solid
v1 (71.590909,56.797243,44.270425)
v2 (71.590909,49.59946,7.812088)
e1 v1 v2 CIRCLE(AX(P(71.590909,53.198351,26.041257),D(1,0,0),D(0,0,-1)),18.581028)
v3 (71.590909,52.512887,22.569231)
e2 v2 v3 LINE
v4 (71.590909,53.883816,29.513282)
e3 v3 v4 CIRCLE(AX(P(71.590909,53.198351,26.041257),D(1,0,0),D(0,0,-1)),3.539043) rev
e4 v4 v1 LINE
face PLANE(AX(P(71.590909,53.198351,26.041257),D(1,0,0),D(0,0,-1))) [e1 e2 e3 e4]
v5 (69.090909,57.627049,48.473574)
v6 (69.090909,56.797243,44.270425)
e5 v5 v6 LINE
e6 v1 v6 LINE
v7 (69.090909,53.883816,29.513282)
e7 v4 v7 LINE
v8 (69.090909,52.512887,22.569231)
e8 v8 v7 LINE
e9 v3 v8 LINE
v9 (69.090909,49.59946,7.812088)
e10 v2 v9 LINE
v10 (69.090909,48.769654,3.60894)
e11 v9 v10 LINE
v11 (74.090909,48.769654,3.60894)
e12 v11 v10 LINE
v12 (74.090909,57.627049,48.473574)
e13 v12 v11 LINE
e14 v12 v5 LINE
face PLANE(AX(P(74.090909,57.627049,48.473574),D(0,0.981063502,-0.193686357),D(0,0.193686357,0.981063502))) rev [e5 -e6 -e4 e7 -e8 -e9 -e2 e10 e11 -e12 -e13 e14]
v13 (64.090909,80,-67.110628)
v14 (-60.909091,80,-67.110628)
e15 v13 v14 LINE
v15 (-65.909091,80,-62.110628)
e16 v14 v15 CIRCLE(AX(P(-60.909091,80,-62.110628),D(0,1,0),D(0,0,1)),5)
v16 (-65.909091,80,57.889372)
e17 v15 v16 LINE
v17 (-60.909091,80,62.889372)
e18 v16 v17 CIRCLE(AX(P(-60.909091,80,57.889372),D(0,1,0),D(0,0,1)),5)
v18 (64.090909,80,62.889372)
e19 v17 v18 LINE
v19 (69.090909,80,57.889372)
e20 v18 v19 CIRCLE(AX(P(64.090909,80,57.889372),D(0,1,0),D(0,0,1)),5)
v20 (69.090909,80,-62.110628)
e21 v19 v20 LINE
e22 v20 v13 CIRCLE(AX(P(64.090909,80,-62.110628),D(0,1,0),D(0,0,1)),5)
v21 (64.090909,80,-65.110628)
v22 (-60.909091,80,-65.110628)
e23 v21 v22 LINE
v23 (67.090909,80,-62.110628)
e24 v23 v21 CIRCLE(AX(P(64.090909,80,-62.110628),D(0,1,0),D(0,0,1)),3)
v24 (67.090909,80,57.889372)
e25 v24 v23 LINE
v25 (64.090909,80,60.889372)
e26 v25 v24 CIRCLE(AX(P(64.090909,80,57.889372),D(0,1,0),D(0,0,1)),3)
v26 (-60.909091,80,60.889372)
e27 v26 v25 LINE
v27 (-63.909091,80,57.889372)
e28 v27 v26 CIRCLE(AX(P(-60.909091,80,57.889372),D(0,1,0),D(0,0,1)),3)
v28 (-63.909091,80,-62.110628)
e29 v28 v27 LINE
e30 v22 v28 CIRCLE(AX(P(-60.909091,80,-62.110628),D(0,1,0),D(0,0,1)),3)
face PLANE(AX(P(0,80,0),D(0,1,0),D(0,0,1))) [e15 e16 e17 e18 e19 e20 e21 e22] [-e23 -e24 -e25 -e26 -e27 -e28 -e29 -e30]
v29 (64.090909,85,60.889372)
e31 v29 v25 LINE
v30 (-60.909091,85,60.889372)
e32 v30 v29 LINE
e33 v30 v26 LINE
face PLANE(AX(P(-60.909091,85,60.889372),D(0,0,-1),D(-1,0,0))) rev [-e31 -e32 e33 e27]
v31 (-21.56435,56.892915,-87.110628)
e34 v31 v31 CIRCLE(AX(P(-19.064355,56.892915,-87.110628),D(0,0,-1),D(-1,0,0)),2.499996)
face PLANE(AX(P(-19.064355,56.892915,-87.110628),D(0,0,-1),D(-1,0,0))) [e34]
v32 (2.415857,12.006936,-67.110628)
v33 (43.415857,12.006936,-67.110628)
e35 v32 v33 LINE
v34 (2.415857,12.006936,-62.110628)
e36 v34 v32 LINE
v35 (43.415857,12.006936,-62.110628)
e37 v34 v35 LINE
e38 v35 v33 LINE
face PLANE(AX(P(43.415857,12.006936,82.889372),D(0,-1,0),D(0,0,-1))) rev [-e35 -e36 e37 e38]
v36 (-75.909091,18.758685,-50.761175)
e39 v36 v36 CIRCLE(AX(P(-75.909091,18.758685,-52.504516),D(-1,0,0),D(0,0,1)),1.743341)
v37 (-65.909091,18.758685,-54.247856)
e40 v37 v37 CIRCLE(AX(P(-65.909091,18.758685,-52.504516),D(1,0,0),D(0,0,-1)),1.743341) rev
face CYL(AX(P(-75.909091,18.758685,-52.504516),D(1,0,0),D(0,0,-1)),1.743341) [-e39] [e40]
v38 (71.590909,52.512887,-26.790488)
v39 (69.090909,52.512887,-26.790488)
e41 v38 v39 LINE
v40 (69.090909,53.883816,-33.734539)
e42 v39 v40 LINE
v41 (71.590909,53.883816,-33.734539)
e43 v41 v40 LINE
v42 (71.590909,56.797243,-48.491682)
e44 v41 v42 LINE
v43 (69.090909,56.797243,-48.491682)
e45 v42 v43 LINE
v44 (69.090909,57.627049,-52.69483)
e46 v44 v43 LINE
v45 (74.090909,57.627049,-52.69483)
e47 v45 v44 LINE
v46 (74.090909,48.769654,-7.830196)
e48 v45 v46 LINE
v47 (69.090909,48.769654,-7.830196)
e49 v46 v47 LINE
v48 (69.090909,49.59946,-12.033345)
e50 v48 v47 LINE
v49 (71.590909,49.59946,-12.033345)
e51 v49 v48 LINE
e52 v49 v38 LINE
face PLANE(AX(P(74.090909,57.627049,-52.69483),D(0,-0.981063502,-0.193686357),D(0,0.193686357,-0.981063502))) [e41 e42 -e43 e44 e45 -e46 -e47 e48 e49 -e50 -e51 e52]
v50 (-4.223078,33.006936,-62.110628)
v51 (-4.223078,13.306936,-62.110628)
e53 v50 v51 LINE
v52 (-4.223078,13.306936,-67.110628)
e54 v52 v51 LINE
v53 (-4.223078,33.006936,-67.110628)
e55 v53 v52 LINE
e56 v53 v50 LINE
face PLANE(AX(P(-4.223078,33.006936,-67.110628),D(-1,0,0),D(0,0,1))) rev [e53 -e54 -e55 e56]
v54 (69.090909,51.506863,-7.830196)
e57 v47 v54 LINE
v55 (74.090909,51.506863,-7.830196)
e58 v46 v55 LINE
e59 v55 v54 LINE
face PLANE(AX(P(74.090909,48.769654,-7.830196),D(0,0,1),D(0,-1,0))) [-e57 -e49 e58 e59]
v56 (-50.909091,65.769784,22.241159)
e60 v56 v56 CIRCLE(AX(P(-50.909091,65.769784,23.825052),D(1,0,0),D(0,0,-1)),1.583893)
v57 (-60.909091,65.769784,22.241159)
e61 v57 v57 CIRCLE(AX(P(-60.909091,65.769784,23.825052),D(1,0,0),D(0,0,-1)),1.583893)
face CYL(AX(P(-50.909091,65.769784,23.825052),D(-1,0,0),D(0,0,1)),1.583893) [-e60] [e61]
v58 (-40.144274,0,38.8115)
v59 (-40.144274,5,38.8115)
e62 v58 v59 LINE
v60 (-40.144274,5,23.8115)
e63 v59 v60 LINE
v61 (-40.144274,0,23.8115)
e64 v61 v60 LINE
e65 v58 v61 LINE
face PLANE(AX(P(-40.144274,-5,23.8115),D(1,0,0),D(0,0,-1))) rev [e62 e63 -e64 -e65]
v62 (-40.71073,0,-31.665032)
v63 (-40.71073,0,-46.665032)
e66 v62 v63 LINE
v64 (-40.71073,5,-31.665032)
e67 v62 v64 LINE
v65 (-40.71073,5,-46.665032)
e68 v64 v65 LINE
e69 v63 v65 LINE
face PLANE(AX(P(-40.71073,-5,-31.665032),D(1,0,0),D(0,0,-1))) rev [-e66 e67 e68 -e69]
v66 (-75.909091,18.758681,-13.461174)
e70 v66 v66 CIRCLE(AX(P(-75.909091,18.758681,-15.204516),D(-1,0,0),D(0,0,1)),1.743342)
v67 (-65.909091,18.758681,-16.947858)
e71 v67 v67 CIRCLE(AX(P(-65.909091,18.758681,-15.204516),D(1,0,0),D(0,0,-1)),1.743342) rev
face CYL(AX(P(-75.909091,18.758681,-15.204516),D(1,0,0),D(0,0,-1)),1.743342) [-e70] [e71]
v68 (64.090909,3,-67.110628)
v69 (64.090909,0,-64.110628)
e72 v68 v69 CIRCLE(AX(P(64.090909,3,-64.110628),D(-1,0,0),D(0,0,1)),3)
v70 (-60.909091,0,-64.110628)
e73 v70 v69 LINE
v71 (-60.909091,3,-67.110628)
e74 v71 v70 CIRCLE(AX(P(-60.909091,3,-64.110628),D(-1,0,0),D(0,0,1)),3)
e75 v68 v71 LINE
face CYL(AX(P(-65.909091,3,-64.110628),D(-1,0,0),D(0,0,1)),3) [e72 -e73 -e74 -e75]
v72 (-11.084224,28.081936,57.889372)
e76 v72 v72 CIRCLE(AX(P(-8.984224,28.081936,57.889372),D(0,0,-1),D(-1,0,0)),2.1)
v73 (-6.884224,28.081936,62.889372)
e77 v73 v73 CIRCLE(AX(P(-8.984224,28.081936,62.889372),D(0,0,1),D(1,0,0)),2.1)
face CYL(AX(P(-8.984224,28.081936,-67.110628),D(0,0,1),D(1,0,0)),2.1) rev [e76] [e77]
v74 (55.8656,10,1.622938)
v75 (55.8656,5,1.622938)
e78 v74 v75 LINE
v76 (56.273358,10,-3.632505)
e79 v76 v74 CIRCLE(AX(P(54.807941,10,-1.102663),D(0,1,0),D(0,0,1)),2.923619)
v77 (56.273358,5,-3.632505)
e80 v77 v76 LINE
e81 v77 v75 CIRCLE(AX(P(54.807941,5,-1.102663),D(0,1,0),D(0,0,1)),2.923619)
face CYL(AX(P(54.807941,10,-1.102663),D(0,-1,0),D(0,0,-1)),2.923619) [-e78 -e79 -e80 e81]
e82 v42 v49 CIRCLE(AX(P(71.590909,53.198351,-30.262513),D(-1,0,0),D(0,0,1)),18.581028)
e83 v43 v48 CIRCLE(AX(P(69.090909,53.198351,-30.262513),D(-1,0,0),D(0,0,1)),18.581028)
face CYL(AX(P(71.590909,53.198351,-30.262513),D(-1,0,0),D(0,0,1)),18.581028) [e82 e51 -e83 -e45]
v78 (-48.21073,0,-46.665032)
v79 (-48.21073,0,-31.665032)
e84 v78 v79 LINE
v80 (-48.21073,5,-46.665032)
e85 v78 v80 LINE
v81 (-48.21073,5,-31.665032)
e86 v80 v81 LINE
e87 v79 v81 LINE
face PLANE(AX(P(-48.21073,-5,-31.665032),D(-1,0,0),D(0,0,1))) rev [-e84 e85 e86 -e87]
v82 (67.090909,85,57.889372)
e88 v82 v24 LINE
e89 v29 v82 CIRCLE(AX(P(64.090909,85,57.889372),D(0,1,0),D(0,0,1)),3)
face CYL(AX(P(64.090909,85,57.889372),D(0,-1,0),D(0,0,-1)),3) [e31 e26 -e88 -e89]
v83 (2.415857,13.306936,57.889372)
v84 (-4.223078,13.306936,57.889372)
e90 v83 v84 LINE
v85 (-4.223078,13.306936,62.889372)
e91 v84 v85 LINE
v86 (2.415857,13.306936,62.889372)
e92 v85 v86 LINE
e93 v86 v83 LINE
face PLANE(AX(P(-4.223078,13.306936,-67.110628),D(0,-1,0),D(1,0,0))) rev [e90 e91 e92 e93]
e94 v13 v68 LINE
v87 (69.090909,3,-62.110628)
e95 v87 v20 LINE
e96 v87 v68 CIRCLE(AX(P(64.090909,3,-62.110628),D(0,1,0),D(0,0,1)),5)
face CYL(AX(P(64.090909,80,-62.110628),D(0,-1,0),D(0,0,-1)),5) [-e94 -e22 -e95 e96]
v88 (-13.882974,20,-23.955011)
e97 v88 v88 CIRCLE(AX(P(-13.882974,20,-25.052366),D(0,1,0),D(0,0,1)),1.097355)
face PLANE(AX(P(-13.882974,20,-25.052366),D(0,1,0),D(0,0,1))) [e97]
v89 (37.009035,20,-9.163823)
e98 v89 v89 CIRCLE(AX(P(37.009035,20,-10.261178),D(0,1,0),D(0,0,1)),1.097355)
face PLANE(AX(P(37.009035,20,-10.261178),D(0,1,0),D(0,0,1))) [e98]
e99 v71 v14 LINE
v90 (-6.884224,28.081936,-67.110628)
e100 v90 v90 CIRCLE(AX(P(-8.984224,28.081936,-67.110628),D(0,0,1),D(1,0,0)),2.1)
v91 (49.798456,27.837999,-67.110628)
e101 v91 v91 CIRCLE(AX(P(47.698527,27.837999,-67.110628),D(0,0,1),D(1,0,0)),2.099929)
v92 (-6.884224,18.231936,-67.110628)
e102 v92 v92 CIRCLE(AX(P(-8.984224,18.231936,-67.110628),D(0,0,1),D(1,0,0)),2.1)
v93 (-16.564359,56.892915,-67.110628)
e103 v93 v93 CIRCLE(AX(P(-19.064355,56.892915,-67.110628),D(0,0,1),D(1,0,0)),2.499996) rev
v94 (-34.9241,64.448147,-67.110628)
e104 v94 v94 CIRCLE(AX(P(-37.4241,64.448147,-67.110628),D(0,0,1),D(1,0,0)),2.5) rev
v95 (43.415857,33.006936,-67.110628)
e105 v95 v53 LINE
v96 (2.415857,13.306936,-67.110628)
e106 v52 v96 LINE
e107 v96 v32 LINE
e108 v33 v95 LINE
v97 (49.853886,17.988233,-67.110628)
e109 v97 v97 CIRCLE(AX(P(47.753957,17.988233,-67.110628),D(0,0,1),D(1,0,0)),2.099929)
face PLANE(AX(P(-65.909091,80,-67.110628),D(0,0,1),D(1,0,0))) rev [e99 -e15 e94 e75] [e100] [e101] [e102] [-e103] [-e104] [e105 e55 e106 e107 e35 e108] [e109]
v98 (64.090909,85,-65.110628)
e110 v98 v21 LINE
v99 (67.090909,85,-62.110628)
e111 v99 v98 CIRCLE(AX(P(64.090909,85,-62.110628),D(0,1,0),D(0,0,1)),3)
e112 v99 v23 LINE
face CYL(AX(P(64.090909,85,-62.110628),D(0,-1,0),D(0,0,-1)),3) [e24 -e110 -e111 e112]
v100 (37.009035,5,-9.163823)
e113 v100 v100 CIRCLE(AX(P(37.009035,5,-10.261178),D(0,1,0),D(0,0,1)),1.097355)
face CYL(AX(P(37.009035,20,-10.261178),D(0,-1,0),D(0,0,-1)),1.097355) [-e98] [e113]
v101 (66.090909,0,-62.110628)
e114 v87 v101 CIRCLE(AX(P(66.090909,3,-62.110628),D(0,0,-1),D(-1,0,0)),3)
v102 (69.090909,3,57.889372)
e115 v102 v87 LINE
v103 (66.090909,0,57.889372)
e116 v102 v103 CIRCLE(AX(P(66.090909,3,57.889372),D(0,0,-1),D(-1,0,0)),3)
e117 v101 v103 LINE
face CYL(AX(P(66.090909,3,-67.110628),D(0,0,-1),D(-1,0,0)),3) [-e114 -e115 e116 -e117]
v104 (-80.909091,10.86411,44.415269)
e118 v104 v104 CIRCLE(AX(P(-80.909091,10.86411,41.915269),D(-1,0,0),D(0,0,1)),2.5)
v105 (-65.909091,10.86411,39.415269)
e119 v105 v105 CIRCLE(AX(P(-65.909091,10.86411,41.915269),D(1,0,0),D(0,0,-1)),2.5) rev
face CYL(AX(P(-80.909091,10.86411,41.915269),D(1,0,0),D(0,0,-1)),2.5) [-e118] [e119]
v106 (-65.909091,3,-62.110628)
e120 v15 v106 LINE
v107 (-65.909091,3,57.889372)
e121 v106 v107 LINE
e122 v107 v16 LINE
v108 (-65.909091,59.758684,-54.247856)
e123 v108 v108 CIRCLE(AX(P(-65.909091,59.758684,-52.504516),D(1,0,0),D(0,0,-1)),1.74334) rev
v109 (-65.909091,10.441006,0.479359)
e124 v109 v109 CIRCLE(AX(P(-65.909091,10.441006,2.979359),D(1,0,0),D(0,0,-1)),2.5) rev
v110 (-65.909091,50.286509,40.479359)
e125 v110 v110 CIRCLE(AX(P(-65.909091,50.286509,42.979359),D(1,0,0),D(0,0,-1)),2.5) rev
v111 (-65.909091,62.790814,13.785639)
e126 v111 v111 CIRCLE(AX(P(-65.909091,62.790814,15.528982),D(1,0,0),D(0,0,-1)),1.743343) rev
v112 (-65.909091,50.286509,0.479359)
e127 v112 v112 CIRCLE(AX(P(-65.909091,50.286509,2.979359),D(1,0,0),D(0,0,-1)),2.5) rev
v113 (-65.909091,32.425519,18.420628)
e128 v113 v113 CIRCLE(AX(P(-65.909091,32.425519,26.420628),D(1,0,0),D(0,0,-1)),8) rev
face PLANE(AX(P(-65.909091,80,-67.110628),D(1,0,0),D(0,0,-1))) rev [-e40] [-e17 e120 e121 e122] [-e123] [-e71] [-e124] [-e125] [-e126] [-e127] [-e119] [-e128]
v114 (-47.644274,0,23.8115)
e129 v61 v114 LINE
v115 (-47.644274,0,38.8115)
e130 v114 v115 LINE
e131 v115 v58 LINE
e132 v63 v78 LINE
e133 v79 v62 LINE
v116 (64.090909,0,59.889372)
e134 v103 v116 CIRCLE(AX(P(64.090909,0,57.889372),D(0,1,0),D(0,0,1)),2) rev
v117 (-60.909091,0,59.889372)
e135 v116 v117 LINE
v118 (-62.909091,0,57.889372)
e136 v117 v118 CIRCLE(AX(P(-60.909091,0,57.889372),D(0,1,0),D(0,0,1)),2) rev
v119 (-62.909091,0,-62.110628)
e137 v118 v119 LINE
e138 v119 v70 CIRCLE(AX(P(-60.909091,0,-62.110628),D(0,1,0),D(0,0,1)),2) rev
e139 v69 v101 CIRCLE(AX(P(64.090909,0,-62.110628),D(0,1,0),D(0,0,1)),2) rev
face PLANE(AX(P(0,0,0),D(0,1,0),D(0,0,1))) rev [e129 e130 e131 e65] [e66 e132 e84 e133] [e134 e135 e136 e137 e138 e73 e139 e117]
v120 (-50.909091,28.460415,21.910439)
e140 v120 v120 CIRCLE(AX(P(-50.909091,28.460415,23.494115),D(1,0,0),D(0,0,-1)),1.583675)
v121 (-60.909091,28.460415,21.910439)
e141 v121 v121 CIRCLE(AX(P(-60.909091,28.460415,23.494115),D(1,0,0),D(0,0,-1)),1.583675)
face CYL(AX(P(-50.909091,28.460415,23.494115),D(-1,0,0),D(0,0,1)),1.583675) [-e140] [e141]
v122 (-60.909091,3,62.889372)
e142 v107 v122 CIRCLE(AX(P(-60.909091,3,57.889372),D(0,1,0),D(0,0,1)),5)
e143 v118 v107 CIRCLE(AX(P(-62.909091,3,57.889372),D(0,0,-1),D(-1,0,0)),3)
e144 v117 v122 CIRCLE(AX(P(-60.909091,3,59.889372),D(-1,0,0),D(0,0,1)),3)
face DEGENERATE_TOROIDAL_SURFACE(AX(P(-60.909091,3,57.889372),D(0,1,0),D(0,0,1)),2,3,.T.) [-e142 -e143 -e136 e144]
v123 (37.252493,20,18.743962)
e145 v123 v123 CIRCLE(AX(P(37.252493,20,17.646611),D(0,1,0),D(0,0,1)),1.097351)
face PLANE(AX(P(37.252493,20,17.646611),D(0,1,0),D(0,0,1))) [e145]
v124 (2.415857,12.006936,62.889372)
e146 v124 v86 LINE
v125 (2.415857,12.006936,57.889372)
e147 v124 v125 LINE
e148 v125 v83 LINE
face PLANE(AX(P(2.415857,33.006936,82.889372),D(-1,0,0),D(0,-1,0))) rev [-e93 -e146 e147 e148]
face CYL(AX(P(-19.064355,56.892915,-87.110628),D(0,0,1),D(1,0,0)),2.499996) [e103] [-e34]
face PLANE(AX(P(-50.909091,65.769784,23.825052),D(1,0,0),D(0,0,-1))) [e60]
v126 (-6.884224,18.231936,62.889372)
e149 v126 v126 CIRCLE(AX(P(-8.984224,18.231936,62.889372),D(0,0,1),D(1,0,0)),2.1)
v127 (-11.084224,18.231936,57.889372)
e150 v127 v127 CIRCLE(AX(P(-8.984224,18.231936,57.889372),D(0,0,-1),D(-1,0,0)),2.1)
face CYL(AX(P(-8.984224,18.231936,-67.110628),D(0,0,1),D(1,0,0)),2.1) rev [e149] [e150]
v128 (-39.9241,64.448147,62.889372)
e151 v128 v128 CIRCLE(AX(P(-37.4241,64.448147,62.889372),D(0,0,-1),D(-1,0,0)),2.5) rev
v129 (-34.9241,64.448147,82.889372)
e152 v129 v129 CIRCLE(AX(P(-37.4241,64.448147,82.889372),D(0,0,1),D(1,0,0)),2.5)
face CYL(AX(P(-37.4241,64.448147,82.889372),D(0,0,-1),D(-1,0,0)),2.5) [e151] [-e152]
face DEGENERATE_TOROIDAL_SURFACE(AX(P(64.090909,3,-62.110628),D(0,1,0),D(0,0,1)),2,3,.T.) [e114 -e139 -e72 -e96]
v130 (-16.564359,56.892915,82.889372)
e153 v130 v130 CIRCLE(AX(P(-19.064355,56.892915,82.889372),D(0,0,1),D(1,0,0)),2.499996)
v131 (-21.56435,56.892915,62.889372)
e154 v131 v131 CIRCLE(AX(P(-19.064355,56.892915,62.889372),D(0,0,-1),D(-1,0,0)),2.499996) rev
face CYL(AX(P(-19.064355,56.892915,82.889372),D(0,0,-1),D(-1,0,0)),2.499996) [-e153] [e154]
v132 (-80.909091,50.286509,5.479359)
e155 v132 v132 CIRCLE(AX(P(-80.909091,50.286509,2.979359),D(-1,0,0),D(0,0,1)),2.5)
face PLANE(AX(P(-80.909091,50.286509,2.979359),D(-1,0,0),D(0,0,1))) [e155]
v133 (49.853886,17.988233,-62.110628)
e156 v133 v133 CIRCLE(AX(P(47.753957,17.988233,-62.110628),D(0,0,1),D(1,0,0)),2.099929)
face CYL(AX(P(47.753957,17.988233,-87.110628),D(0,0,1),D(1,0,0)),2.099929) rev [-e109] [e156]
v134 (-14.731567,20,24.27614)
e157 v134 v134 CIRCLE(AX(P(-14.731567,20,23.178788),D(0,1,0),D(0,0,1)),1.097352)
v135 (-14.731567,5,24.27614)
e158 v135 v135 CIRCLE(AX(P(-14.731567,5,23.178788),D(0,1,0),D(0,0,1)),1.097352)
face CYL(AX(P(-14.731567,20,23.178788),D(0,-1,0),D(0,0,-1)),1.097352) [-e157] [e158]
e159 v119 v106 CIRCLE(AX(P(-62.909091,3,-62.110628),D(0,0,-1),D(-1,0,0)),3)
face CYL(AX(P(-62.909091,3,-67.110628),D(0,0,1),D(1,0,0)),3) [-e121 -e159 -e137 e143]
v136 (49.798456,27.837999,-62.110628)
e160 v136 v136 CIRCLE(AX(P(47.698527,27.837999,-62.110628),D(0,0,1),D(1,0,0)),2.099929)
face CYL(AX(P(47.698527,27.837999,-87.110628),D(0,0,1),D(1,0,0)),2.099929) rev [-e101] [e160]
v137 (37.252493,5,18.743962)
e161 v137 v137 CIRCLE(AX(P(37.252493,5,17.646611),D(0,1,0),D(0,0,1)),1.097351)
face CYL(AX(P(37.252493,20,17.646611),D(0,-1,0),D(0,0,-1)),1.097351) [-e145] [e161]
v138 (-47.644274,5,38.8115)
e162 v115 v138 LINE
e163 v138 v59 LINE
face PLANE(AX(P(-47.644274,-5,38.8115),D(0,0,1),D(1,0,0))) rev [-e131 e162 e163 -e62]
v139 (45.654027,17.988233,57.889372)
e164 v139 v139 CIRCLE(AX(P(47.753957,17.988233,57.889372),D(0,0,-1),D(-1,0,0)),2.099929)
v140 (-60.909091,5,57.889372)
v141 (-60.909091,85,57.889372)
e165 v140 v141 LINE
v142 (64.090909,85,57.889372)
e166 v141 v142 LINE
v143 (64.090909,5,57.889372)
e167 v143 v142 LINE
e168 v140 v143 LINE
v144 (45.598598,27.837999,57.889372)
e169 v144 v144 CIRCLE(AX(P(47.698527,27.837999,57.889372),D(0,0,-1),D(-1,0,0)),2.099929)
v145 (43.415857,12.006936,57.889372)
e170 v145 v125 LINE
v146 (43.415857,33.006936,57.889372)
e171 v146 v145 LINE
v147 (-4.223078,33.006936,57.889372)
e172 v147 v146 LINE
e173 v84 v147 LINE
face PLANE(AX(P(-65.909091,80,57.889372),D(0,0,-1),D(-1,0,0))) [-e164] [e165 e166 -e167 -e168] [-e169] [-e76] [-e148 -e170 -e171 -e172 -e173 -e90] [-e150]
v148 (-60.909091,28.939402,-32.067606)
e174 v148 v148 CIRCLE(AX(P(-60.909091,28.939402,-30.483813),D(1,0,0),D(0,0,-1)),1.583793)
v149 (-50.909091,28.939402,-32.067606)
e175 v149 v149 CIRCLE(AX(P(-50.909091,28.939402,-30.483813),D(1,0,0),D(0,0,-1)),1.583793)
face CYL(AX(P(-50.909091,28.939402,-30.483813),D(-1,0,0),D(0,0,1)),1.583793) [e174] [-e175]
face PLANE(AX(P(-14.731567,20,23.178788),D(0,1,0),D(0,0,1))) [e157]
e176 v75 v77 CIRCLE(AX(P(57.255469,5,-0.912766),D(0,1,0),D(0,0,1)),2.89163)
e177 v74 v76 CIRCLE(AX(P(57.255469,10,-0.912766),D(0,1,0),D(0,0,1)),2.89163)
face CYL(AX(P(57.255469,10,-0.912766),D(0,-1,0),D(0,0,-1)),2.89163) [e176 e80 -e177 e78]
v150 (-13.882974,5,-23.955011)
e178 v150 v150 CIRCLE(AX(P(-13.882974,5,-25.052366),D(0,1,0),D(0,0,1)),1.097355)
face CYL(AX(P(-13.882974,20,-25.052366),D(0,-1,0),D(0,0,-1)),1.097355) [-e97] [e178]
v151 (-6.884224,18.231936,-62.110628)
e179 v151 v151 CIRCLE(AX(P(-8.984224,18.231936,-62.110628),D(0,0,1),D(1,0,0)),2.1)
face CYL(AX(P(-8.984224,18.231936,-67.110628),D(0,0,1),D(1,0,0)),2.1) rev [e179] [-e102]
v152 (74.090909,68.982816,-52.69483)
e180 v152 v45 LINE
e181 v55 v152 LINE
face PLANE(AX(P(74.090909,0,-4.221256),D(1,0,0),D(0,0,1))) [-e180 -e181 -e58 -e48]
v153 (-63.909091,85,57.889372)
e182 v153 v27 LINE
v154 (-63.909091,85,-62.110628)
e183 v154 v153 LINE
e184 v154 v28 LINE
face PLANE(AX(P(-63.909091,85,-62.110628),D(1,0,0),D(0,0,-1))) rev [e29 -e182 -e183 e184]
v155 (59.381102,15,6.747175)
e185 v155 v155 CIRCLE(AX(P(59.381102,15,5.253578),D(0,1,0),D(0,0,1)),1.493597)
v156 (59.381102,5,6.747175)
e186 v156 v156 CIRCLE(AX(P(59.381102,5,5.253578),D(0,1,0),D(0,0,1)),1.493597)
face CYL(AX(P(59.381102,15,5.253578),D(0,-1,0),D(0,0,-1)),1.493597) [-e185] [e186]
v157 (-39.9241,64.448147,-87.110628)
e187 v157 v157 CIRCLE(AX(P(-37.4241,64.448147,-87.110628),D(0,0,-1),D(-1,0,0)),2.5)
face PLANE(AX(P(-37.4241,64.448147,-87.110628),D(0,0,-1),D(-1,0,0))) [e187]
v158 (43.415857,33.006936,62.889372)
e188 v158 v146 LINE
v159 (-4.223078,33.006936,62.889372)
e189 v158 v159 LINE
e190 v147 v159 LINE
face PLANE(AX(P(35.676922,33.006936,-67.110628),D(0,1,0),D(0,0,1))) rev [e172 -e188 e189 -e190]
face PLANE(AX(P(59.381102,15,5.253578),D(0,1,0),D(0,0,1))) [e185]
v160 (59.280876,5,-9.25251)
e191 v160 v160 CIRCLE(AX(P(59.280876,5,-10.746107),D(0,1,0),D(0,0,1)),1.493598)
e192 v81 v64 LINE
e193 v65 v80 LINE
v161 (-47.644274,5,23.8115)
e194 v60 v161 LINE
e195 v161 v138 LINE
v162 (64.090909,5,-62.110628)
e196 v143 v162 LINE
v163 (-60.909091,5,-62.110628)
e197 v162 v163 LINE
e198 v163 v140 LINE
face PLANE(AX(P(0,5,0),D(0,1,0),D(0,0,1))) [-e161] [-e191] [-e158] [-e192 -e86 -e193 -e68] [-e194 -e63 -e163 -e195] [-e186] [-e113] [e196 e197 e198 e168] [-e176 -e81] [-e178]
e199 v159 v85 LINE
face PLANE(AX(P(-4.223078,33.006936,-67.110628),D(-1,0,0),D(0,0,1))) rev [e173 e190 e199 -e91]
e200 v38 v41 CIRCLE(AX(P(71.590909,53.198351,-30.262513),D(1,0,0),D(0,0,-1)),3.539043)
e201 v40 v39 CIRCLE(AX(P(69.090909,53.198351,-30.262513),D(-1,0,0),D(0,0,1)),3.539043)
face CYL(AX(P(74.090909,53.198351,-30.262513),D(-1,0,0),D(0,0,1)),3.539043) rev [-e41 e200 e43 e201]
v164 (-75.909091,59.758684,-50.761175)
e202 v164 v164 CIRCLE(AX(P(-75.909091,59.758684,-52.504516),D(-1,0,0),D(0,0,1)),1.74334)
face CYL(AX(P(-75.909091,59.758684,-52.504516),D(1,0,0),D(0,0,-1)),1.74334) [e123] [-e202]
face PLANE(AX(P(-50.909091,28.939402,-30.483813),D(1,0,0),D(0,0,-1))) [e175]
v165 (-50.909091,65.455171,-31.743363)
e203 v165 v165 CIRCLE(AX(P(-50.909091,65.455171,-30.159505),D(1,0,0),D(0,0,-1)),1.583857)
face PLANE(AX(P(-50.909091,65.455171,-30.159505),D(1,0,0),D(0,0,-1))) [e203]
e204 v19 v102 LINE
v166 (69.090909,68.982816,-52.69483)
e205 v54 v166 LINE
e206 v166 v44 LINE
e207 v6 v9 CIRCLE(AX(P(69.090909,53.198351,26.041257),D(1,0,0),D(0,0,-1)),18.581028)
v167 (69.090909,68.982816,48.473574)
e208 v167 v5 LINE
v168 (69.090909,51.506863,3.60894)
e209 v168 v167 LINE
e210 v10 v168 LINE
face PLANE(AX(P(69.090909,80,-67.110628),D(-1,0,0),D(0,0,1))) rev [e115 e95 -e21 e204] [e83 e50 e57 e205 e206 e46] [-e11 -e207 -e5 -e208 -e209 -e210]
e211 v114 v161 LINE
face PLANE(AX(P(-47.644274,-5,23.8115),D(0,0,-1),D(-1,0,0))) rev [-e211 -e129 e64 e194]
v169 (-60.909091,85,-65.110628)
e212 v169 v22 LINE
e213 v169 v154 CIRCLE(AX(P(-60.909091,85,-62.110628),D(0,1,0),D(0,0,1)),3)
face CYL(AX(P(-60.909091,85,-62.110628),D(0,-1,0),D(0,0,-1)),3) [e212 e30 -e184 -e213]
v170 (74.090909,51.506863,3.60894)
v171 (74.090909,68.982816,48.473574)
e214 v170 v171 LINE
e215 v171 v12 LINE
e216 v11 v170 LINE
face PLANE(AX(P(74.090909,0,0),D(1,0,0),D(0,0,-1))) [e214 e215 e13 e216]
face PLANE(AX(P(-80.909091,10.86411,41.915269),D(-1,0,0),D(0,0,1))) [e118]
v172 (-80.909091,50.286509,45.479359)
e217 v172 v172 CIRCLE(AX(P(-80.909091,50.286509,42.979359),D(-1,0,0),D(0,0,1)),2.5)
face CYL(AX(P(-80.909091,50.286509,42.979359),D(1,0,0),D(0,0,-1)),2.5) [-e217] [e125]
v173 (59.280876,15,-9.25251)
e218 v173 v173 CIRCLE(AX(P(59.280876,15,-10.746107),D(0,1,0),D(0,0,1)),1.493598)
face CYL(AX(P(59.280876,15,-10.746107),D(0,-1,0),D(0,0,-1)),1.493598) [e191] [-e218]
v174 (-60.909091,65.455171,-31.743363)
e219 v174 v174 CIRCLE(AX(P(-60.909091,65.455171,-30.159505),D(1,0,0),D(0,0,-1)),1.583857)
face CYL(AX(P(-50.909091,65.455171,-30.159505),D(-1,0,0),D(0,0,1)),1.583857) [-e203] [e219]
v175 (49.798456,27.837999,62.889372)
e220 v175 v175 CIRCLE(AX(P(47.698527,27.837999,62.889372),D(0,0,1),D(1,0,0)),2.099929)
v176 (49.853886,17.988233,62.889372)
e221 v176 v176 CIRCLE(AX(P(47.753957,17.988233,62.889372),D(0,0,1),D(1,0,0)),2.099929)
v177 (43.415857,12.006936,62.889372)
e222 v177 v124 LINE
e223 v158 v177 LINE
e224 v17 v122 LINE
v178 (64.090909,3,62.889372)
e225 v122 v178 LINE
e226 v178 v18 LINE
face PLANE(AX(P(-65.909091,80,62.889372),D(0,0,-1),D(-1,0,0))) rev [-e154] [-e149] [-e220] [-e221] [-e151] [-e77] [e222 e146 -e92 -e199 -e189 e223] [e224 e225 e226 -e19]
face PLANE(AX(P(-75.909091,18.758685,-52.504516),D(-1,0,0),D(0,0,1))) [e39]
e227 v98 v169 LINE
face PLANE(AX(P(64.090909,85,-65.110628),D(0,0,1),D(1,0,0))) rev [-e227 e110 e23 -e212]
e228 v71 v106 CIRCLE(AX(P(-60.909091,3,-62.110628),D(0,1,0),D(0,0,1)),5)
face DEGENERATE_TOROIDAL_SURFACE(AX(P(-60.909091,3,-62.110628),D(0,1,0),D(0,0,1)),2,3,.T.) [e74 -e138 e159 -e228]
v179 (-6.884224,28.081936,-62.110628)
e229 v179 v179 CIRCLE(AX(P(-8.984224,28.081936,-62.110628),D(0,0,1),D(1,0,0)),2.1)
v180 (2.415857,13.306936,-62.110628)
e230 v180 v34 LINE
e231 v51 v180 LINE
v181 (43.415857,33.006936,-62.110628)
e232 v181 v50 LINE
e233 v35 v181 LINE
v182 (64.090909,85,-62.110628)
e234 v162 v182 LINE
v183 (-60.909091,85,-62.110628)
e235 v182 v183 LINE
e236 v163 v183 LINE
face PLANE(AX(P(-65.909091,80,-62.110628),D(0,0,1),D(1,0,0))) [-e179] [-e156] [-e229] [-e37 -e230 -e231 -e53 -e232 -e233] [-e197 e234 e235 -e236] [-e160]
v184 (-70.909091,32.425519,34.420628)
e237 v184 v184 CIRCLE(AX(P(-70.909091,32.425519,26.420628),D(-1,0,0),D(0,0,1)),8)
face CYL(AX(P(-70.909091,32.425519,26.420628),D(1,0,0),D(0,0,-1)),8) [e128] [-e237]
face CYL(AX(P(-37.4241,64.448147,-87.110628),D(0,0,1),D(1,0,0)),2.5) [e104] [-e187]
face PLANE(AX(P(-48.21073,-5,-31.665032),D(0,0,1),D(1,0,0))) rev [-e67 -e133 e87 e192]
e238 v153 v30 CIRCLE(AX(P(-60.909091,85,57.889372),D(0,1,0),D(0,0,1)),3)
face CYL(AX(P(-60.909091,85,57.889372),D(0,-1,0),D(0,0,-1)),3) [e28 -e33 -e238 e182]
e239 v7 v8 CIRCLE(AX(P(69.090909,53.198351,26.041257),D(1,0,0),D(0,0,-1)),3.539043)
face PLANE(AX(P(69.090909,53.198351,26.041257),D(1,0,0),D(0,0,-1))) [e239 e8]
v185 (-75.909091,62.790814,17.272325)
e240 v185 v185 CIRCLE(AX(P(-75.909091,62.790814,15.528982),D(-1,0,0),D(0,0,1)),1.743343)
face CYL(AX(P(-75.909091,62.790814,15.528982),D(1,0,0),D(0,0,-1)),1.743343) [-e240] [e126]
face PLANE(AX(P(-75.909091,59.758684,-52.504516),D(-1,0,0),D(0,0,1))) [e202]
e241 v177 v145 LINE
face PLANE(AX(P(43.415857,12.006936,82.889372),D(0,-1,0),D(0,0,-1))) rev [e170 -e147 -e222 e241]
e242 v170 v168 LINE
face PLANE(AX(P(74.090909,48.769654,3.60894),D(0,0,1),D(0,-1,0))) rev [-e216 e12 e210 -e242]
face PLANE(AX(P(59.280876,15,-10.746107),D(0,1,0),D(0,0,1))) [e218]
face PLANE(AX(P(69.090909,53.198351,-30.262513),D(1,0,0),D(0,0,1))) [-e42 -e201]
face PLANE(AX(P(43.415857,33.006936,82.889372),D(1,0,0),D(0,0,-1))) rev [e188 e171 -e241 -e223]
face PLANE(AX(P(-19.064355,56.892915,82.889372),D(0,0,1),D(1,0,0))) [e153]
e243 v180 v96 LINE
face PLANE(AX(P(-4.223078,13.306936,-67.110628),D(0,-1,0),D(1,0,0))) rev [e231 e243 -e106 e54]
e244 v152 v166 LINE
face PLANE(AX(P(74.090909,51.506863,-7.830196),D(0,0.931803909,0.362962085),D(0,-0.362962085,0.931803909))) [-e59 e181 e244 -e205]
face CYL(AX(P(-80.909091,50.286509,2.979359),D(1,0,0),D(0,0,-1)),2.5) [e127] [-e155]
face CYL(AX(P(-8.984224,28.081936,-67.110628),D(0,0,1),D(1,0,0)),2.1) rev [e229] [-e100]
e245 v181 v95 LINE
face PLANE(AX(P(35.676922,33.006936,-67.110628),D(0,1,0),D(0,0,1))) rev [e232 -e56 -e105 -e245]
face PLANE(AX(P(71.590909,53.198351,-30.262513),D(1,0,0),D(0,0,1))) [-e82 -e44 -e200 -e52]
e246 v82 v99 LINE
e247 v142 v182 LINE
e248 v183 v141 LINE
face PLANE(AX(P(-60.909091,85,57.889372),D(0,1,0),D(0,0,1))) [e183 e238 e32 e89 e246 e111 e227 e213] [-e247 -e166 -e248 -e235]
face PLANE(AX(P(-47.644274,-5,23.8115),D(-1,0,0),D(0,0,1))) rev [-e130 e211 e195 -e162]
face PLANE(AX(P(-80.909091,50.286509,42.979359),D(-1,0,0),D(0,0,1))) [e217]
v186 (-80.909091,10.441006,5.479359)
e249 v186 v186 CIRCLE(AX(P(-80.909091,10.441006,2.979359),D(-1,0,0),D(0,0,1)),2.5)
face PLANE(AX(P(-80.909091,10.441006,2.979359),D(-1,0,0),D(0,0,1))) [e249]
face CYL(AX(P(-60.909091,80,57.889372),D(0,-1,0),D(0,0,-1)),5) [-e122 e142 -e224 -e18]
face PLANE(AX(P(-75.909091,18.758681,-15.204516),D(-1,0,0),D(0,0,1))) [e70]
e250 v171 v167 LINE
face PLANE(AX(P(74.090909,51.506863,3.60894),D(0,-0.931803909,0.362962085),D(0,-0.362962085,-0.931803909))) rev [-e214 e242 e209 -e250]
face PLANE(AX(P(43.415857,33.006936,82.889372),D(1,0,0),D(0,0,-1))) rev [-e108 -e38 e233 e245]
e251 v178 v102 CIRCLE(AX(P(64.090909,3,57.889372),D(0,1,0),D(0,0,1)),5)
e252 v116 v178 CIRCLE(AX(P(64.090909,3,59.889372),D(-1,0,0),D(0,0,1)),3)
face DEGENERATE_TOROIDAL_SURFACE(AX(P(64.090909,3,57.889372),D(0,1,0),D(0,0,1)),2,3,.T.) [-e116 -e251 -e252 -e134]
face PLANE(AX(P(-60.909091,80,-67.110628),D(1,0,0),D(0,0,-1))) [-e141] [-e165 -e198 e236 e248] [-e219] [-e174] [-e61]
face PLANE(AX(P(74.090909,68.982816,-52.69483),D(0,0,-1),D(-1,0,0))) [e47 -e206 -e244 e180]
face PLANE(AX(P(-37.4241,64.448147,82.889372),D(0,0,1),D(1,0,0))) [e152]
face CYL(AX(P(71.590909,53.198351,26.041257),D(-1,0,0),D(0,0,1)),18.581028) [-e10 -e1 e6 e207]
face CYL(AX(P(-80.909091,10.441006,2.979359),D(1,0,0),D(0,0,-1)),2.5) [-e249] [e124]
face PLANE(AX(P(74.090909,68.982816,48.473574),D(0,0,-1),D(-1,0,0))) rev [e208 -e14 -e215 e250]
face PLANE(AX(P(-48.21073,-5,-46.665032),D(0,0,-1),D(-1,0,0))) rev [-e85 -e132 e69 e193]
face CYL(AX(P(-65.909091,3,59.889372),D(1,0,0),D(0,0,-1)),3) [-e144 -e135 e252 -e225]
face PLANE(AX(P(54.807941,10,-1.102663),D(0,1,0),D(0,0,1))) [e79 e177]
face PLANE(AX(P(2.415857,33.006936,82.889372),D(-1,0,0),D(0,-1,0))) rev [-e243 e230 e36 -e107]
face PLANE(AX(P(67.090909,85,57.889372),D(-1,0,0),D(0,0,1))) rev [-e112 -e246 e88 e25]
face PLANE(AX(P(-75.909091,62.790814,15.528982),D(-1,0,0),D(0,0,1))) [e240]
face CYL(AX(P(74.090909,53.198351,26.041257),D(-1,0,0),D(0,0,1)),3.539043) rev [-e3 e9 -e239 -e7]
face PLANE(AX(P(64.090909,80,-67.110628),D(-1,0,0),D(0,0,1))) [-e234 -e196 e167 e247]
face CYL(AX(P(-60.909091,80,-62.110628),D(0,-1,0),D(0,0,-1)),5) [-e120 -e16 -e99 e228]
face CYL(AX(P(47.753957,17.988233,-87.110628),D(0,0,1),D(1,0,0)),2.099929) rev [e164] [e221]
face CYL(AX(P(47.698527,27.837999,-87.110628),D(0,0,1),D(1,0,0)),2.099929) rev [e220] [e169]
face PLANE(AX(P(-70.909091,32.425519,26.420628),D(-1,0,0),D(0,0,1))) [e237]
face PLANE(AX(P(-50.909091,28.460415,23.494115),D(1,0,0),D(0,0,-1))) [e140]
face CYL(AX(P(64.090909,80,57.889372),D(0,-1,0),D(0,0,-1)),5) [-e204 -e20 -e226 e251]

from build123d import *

# Parameters (mm, degrees)
SKETCH1_W               = 135
SKETCH1_H               = 130
BOSS_EXTRUDE1_DEPTH     = 80
FILLET3_R               = 5
SHELL4_START            = -60.909090909
SHELL4_OUTLINE_W        = 75
SHELL4_OUTLINE_H        = 120
SHELL4_DEPTH            = 125
BOSS_EXTRUDE5_DEPTH     = 5
SKETCH12_W              = 125
SKETCH12_H              = 120
CUT_EXTRUDE7_DEPTH      = 30
SKETCH51_R              = 2.1
SKETCH51_W              = 39.9
SKETCH51_H              = 19.7
CUT_EXTRUDE8_DEPTH      = 170.995746179
SKETCH52_R              = 2.5
BOSS_EXTRUDE29_DEPTH    = 20
BOSS_EXTRUDE30_START    = 20
SKETCH53_R              = 2.5
BOSS_EXTRUDE30_DEPTH    = 20
SKETCH54_R              = 1.097354929
SKETCH54_R_2            = 1.097354846
SKETCH54_R_3            = 1.097350713
SKETCH54_R_4            = 1.097352291
BOSS_EXTRUDE31_DEPTH    = 15
SKETCH55_R              = 1.493597511
SKETCH55_R_2            = 1.49359734
BOSS_EXTRUDE32_DEPTH    = 10
SKETCH56_R              = 2.923618592
BOSS_EXTRUDE33_DEPTH    = 5
SKETCH58_R              = 1.583892905
SKETCH58_R_2            = 1.583857327
SKETCH58_R_3            = 1.583793031
SKETCH58_R_4            = 1.583675268
BOSS_EXTRUDE35_DEPTH    = 10
SKETCH60_W              = 7.5
SKETCH60_H              = 15
CUT_EXTRUDE10_DEPTH     = 10
SKETCH61_R              = 8
BOSS_EXTRUDE36_DEPTH    = 5
SKETCH62_R              = 2.5
BOSS_EXTRUDE37_DEPTH    = 15
BOSS_EXTRUDE38_DEPTH    = 2.5
BOSS_EXTRUDE39_DEPTH    = 5
CUT_EXTRUDE11_DEPTH     = 5
FILLET4_R               = 3
CUT_EXTRUDE5_DEPTH      = 191.450206069
CUT_EXTRUDE5_DEPTH_BACK = 191.450206069
SKETCH14_W              = 41
SKETCH14_H              = 21
SKETCH38_R              = 2.499995695
BOSS_EXTRUDE19_DEPTH    = 20
SKETCH39_R              = 2.099929147
SKETCH39_R_2            = 2.1
CUT_EXTRUDE6_DEPTH      = 191.450206069
BOSS_EXTRUDE20_START    = 20
SKETCH40_R              = 2.499995695
BOSS_EXTRUDE20_DEPTH    = 20
SKETCH41_R              = 1.743340357
SKETCH41_R_2            = 1.74334297
SKETCH41_R_3            = 1.743341919
SKETCH41_R_4            = 1.743340762
BOSS_EXTRUDE21_DEPTH    = 10
SKETCH42_R              = 1.583857307
SKETCH42_R_2            = 1.583793042
SKETCH42_R_3            = 1.58367528
SKETCH42_R_4            = 1.583892837
BOSS_EXTRUDE22_DEPTH    = 10
SKETCH43_R              = 1.097354928
SKETCH43_R_2            = 1.097354845
SKETCH43_R_3            = 1.097350705
SKETCH43_R_4            = 1.097352292
BOSS_EXTRUDE23_DEPTH    = 15
SKETCH48_R              = 2.891630162
BOSS_EXTRUDE27_DEPTH    = 5
SKETCH49_R              = 1.493597522
SKETCH49_R_2            = 1.49359734
BOSS_EXTRUDE28_DEPTH    = 10


# Read off the part's stored shape, not the designer's step: Shell4
with BuildPart() as part:
    # Sketch1 → Boss-Extrude1 (new body)
    with BuildSketch(Plane(origin=(0, 0, 0), x_dir=(1, 0, 0), z_dir=(0, 1, 0))):
        with Locations((1.590909091, 2.110628243)):
            Rectangle(SKETCH1_W, SKETCH1_H)
    extrude(amount=BOSS_EXTRUDE1_DEPTH)

    # Fillet3
    fillet3_edges = [part.edges().sort_by_distance(p)[0] for p in [
        (-65.909090909, 40, -67.110628243),
        (69.090909091, 40, -67.110628243),
        (69.090909091, 40, 62.889371757),
        (-65.909090909, 40, 62.889371757),
    ]]
    fillet(fillet3_edges, radius=FILLET3_R)

    # Shell4 outline → Shell4 (cut)
    with BuildSketch(Plane.YZ.offset(SHELL4_START)):
        with Locations((42.5, -2.110628243)):
            Rectangle(SHELL4_OUTLINE_W, SHELL4_OUTLINE_H)
    extrude(amount=SHELL4_DEPTH, mode=Mode.SUBTRACT)

    # Sketch6 → Boss-Extrude5 (add)
    with BuildSketch(Plane(origin=(0, 80, 0), x_dir=(1, 0, 0), z_dir=(0, 1, 0))):
        with BuildLine():
            Line((-60.909090909, -60.889371757), (64.090909091, -60.889371757))
            ThreePointArc((64.090909091, -60.889371757), (66.212229434, -60.010692101), (67.090909091, -57.889371757))
            Line((67.090909091, -57.889371757), (67.090909091, 62.110628243))
            ThreePointArc((67.090909091, 62.110628243), (66.212229434, 64.231948586), (64.090909091, 65.110628243))
            Line((64.090909091, 65.110628243), (-60.909090909, 65.110628243))
            ThreePointArc((-60.909090909, 65.110628243), (-63.030411253, 64.231948586), (-63.909090909, 62.110628243))
            Line((-63.909090909, 62.110628243), (-63.909090909, -57.889371757))
            ThreePointArc((-63.909090909, -57.889371757), (-63.030411253, -60.010692101), (-60.909090909, -60.889371757))
        make_face()
    extrude(amount=BOSS_EXTRUDE5_DEPTH)

    # Sketch12 → Cut-Extrude7 (cut)
    with BuildSketch(Plane(origin=(0, 85, 0), x_dir=(1, 0, 0), z_dir=(0, 1, 0))):
        with Locations((1.590909091, 2.110628243)):
            Rectangle(SKETCH12_W, SKETCH12_H)
    extrude(amount=-CUT_EXTRUDE7_DEPTH, mode=Mode.SUBTRACT)

    # Sketch51 → Cut-Extrude8 (cut, through all)
    with BuildSketch(Plane.XY.offset(62.889371757)):
        with Locations((-8.984223689, 28.081935568)):
            Circle(SKETCH51_R)
        with Locations((-8.984223689, 18.231935568)):
            Circle(SKETCH51_R)
        with Locations((40.438067547, 28.081935568)):
            Circle(SKETCH51_R)
        with Locations((40.438067547, 18.231935568)):
            Circle(SKETCH51_R)
        with Locations((15.726921929, 23.156935568)):
            Rectangle(SKETCH51_W, SKETCH51_H)
    extrude(amount=-CUT_EXTRUDE8_DEPTH, mode=Mode.SUBTRACT)

    # Sketch52 → Boss-Extrude29 (add)
    with BuildSketch(Plane.XY.offset(62.889371757)):
        with Locations(Location((-37.424099567, 64.448146968, 0), (0, 0, 180))):
            Circle(SKETCH52_R)
    extrude(amount=BOSS_EXTRUDE29_DEPTH)

    # Sketch53 → Boss-Extrude30 (add)
    with BuildSketch(Plane(origin=(0, 0, -67.110628243), x_dir=(-1, 0, 0), z_dir=(0, 0, -1)).offset(BOSS_EXTRUDE30_START)):
        with Locations((37.424099567, 64.448146968)):
            Circle(SKETCH53_R)
    extrude(amount=-BOSS_EXTRUDE30_DEPTH)

    # Sketch54 → Boss-Extrude31 (add)
    with BuildSketch(Plane(origin=(0, 5, 0), x_dir=(1, 0, 0), z_dir=(0, 1, 0))):
        with Locations(Location((-13.882974331, 25.052366393, 0), (0, 0, 270))):
            Circle(SKETCH54_R)
        with Locations(Location((37.009034905, 10.261178321, 0), (0, 0, 270))):
            Circle(SKETCH54_R_2)
        with Locations(Location((37.252493084, -17.646611168, 0), (0, 0, 270))):
            Circle(SKETCH54_R_3)
        with Locations(Location((-14.731567108, -23.178787611, 0), (0, 0, 270))):
            Circle(SKETCH54_R_4)
    extrude(amount=BOSS_EXTRUDE31_DEPTH)

    # Sketch55 → Boss-Extrude32 (add)
    with BuildSketch(Plane(origin=(0, 5, 0), x_dir=(1, 0, 0), z_dir=(0, 1, 0))):
        with Locations(Location((59.280875612, 10.746107148, 0), (0, 0, 270))):
            Circle(SKETCH55_R)
        with Locations(Location((59.381101783, -5.253577831, 0), (0, 0, 270))):
            Circle(SKETCH55_R_2)
    extrude(amount=BOSS_EXTRUDE32_DEPTH)

    # Sketch56 → Boss-Extrude33 (add)
    with BuildSketch(Plane(origin=(0, 5, 0), x_dir=(1, 0, 0), z_dir=(0, 1, 0))):
        with Locations(Location((54.807940882, 1.102663458, 0), (0, 0, 270))):
            Circle(SKETCH56_R)
    extrude(amount=BOSS_EXTRUDE33_DEPTH)

    # Sketch58 → Boss-Extrude35 (add)
    with BuildSketch(Plane(origin=(-60.909090909, 0, 0), x_dir=(0, 0, -1), z_dir=(1, 0, 0))):
        with Locations((-23.825052013, 65.769783842)):
            Circle(SKETCH58_R)
        with Locations((30.159505374, 65.455170881)):
            Circle(SKETCH58_R_2)
        with Locations((30.483812669, 28.939401841)):
            Circle(SKETCH58_R_3)
        with Locations((-23.494114633, 28.460414527)):
            Circle(SKETCH58_R_4)
    extrude(amount=BOSS_EXTRUDE35_DEPTH)

    # Sketch60 → Cut-Extrude10 (cut)
    with BuildSketch(Plane(origin=(0, 5, 0), x_dir=(1, 0, 0), z_dir=(0, 1, 0))):
        with Locations((-43.894273907, -31.311500115)):
            Rectangle(SKETCH60_W, SKETCH60_H)
        with Locations((-44.460730283, 39.165032156)):
            Rectangle(SKETCH60_W, SKETCH60_H)
    extrude(amount=-CUT_EXTRUDE10_DEPTH, mode=Mode.SUBTRACT)

    # Sketch61 → Boss-Extrude36 (add)
    with BuildSketch(Plane.ZY.offset(65.909090909)):
        with Locations(Location((26.420628094, 32.425519239, 0), (0, 0, 180))):
            Circle(SKETCH61_R)
    extrude(amount=BOSS_EXTRUDE36_DEPTH)

    # Sketch62 → Boss-Extrude37 (add)
    with BuildSketch(Plane.ZY.offset(65.909090909)):
        with Locations(Location((2.979358583, 50.286508583, 0), (0, 0, 180))):
            Circle(SKETCH62_R)
        with Locations(Location((42.979358583, 50.286508583, 0), (0, 0, 180))):
            Circle(SKETCH62_R)
        with Locations(Location((41.91526883, 10.864110099, 0), (0, 0, 180))):
            Circle(SKETCH62_R)
        with Locations(Location((2.979358583, 10.441006071, 0), (0, 0, 180))):
            Circle(SKETCH62_R)
    extrude(amount=BOSS_EXTRUDE37_DEPTH)

    # Sketch66 → Boss-Extrude38 (add)
    with BuildSketch(Plane(origin=(69.090909091, 0, 0), x_dir=(0, 0, -1), z_dir=(1, 0, 0))):
        with BuildLine():
            Line((-44.270425373, 56.797242998), (-7.812088138, 49.599459681))
            ThreePointArc((-7.812088138, 49.599459681), (-29.640148414, 34.969182723), (-44.270425373, 56.797242998))
        make_face()
    boss_extrude38 = extrude(amount=BOSS_EXTRUDE38_DEPTH)

    # Sketch64 → Boss-Extrude39 (add)
    with BuildSketch(Plane(origin=(69.090909091, 0, 0), x_dir=(0, 0, -1), z_dir=(1, 0, 0))):
        Polygon((-48.473573965, 68.982815523), (-48.473573965, 57.627049158), (-3.608939546, 48.769653522), (-3.608939546, 51.506862595), align=None)
    boss_extrude39 = extrude(amount=BOSS_EXTRUDE39_DEPTH)

    # Sketch69 → Cut-Extrude11 (cut)
    with BuildSketch(Plane(origin=(69.090909091, 0, 0), x_dir=(0, 0, -1), z_dir=(1, 0, 0))):
        with BuildLine():
            Line((-29.513282432, 53.883815636), (-22.569231079, 52.512887043))
            ThreePointArc((-22.569231079, 52.512887043), (-26.726721052, 49.726325664), (-29.513282432, 53.883815636))
        make_face()
    cut_extrude11 = extrude(amount=CUT_EXTRUDE11_DEPTH, mode=Mode.SUBTRACT)

    # Mirror3: Boss-Extrude38, Boss-Extrude39, Cut-Extrude11 across plane
    add(boss_extrude38.mirror(Plane.XY.offset(-2.110628243)))
    add(boss_extrude39.mirror(Plane.XY.offset(-2.110628243)))
    add(cut_extrude11.mirror(Plane.XY.offset(-2.110628243)), mode=Mode.SUBTRACT)

    # Fillet4
    fillet4_edges = [part.edges().sort_by_distance(p)[0] for p in [
        (69.090909091, 0, -2.110628243),
        (-65.909090909, 0, -2.110628243),
        (1.590909091, 0, -67.110628243),
        (1.590909091, 0, 62.889371757),
        (-64.444624815, 0, -65.646162149),
        (67.626442997, 0, -65.646162149),
        (-64.444624815, 0, 61.424905663),
        (67.626442997, 0, 61.424905663),
    ]]
    fillet(fillet4_edges, radius=FILLET4_R)

    # Sketch14 → Cut-Extrude5 (cut, two sides: drawn at the far end of the back side and taken through both)
    with BuildSketch(Plane(origin=(0, 0, -67.110628243), x_dir=(-1, 0, 0), z_dir=(0, 0, -1)).offset(-CUT_EXTRUDE5_DEPTH_BACK)):
        with Locations((-22.915856751, 22.506935568)):
            Rectangle(SKETCH14_W, SKETCH14_H)
    extrude(amount=CUT_EXTRUDE5_DEPTH + CUT_EXTRUDE5_DEPTH_BACK, mode=Mode.SUBTRACT)

    # Sketch38 → Boss-Extrude19 (add)
    with BuildSketch(Plane.XY.offset(62.889371757)):
        with Locations(Location((-19.064354595, 56.892914504, 0), (0, 0, 180))):
            Circle(SKETCH38_R)
    extrude(amount=BOSS_EXTRUDE19_DEPTH)

    # Sketch39 → Cut-Extrude6 (cut, through all)
    with BuildSketch(Plane.XY.offset(62.889371757)):
        with Locations((47.698527272, 27.837999273)):
            Circle(SKETCH39_R)
        with Locations((47.753956504, 17.988233098)):
            Circle(SKETCH39_R)
        with Locations((-1.666283345, 17.711534904)):
            Circle(SKETCH39_R_2)
        with Locations((-1.704515098, 27.570940529)):
            Circle(SKETCH39_R)
    extrude(amount=-CUT_EXTRUDE6_DEPTH, mode=Mode.SUBTRACT)

    # Sketch40 → Boss-Extrude20 (add)
    with BuildSketch(Plane(origin=(0, 0, -67.110628243), x_dir=(-1, 0, 0), z_dir=(0, 0, -1)).offset(BOSS_EXTRUDE20_START)):
        with Locations((19.064354595, 56.892914504)):
            Circle(SKETCH40_R)
    extrude(amount=-BOSS_EXTRUDE20_DEPTH)

    # Sketch41 → Boss-Extrude21 (add)
    with BuildSketch(Plane.ZY.offset(65.909090909)):
        with Locations(Location((-52.504515626, 59.75868372, 0), (0, 0, 180))):
            Circle(SKETCH41_R)
        with Locations(Location((15.528981547, 62.790814483, 0), (0, 0, 180))):
            Circle(SKETCH41_R_2)
        with Locations(Location((-15.204516125, 18.75868119, 0), (0, 0, 180))):
            Circle(SKETCH41_R_3)
        with Locations(Location((-52.504515626, 18.758684916, 0), (0, 0, 180))):
            Circle(SKETCH41_R_4)
    extrude(amount=BOSS_EXTRUDE21_DEPTH)

    # Sketch42 → Boss-Extrude22 (add)
    with BuildSketch(Plane(origin=(-60.909090909, 0, 0), x_dir=(0, 0, -1), z_dir=(1, 0, 0))):
        with Locations((30.15950535, 65.45517088)):
            Circle(SKETCH42_R)
        with Locations((30.483812669, 28.939401841)):
            Circle(SKETCH42_R_2)
        with Locations(Location((-23.494114636, 28.460414515, 0), (0, 0, 4.3e-07))):
            Circle(SKETCH42_R_3)
        with Locations(Location((-23.825052085, 65.769783916, 0), (0, 0, 359.999997299))):
            Circle(SKETCH42_R_4)
    extrude(amount=BOSS_EXTRUDE22_DEPTH)

    # Sketch43 → Boss-Extrude23 (add)
    with BuildSketch(Plane(origin=(0, 5, 0), x_dir=(1, 0, 0), z_dir=(0, 1, 0))):
        with Locations(Location((-13.882974331, 25.052366393, 0), (0, 0, 270))):
            Circle(SKETCH43_R)
        with Locations(Location((37.009034905, 10.261178321, 0), (0, 0, 270))):
            Circle(SKETCH43_R_2)
        with Locations(Location((37.252493084, -17.646611168, 0), (0, 0, 270))):
            Circle(SKETCH43_R_3)
        with Locations(Location((-14.731567108, -23.178787611, 0), (0, 0, 270))):
            Circle(SKETCH43_R_4)
    extrude(amount=BOSS_EXTRUDE23_DEPTH)

    # Sketch48 → Boss-Extrude27 (add)
    with BuildSketch(Plane(origin=(0, 5, 0), x_dir=(1, 0, 0), z_dir=(0, 1, 0))):
        with Locations((57.255468538, 0.912765664)):
            Circle(SKETCH48_R)
    extrude(amount=BOSS_EXTRUDE27_DEPTH)

    # Sketch49 → Boss-Extrude28 (add)
    with BuildSketch(Plane(origin=(0, 5, 0), x_dir=(1, 0, 0), z_dir=(0, 1, 0))):
        with Locations(Location((59.280875612, 10.746107148, 0), (0, 0, 270))):
            Circle(SKETCH49_R)
        with Locations(Location((59.381101783, -5.253577831, 0), (0, 0, 270))):
            Circle(SKETCH49_R_2)
    extrude(amount=BOSS_EXTRUDE28_DEPTH)


solid = part.part
